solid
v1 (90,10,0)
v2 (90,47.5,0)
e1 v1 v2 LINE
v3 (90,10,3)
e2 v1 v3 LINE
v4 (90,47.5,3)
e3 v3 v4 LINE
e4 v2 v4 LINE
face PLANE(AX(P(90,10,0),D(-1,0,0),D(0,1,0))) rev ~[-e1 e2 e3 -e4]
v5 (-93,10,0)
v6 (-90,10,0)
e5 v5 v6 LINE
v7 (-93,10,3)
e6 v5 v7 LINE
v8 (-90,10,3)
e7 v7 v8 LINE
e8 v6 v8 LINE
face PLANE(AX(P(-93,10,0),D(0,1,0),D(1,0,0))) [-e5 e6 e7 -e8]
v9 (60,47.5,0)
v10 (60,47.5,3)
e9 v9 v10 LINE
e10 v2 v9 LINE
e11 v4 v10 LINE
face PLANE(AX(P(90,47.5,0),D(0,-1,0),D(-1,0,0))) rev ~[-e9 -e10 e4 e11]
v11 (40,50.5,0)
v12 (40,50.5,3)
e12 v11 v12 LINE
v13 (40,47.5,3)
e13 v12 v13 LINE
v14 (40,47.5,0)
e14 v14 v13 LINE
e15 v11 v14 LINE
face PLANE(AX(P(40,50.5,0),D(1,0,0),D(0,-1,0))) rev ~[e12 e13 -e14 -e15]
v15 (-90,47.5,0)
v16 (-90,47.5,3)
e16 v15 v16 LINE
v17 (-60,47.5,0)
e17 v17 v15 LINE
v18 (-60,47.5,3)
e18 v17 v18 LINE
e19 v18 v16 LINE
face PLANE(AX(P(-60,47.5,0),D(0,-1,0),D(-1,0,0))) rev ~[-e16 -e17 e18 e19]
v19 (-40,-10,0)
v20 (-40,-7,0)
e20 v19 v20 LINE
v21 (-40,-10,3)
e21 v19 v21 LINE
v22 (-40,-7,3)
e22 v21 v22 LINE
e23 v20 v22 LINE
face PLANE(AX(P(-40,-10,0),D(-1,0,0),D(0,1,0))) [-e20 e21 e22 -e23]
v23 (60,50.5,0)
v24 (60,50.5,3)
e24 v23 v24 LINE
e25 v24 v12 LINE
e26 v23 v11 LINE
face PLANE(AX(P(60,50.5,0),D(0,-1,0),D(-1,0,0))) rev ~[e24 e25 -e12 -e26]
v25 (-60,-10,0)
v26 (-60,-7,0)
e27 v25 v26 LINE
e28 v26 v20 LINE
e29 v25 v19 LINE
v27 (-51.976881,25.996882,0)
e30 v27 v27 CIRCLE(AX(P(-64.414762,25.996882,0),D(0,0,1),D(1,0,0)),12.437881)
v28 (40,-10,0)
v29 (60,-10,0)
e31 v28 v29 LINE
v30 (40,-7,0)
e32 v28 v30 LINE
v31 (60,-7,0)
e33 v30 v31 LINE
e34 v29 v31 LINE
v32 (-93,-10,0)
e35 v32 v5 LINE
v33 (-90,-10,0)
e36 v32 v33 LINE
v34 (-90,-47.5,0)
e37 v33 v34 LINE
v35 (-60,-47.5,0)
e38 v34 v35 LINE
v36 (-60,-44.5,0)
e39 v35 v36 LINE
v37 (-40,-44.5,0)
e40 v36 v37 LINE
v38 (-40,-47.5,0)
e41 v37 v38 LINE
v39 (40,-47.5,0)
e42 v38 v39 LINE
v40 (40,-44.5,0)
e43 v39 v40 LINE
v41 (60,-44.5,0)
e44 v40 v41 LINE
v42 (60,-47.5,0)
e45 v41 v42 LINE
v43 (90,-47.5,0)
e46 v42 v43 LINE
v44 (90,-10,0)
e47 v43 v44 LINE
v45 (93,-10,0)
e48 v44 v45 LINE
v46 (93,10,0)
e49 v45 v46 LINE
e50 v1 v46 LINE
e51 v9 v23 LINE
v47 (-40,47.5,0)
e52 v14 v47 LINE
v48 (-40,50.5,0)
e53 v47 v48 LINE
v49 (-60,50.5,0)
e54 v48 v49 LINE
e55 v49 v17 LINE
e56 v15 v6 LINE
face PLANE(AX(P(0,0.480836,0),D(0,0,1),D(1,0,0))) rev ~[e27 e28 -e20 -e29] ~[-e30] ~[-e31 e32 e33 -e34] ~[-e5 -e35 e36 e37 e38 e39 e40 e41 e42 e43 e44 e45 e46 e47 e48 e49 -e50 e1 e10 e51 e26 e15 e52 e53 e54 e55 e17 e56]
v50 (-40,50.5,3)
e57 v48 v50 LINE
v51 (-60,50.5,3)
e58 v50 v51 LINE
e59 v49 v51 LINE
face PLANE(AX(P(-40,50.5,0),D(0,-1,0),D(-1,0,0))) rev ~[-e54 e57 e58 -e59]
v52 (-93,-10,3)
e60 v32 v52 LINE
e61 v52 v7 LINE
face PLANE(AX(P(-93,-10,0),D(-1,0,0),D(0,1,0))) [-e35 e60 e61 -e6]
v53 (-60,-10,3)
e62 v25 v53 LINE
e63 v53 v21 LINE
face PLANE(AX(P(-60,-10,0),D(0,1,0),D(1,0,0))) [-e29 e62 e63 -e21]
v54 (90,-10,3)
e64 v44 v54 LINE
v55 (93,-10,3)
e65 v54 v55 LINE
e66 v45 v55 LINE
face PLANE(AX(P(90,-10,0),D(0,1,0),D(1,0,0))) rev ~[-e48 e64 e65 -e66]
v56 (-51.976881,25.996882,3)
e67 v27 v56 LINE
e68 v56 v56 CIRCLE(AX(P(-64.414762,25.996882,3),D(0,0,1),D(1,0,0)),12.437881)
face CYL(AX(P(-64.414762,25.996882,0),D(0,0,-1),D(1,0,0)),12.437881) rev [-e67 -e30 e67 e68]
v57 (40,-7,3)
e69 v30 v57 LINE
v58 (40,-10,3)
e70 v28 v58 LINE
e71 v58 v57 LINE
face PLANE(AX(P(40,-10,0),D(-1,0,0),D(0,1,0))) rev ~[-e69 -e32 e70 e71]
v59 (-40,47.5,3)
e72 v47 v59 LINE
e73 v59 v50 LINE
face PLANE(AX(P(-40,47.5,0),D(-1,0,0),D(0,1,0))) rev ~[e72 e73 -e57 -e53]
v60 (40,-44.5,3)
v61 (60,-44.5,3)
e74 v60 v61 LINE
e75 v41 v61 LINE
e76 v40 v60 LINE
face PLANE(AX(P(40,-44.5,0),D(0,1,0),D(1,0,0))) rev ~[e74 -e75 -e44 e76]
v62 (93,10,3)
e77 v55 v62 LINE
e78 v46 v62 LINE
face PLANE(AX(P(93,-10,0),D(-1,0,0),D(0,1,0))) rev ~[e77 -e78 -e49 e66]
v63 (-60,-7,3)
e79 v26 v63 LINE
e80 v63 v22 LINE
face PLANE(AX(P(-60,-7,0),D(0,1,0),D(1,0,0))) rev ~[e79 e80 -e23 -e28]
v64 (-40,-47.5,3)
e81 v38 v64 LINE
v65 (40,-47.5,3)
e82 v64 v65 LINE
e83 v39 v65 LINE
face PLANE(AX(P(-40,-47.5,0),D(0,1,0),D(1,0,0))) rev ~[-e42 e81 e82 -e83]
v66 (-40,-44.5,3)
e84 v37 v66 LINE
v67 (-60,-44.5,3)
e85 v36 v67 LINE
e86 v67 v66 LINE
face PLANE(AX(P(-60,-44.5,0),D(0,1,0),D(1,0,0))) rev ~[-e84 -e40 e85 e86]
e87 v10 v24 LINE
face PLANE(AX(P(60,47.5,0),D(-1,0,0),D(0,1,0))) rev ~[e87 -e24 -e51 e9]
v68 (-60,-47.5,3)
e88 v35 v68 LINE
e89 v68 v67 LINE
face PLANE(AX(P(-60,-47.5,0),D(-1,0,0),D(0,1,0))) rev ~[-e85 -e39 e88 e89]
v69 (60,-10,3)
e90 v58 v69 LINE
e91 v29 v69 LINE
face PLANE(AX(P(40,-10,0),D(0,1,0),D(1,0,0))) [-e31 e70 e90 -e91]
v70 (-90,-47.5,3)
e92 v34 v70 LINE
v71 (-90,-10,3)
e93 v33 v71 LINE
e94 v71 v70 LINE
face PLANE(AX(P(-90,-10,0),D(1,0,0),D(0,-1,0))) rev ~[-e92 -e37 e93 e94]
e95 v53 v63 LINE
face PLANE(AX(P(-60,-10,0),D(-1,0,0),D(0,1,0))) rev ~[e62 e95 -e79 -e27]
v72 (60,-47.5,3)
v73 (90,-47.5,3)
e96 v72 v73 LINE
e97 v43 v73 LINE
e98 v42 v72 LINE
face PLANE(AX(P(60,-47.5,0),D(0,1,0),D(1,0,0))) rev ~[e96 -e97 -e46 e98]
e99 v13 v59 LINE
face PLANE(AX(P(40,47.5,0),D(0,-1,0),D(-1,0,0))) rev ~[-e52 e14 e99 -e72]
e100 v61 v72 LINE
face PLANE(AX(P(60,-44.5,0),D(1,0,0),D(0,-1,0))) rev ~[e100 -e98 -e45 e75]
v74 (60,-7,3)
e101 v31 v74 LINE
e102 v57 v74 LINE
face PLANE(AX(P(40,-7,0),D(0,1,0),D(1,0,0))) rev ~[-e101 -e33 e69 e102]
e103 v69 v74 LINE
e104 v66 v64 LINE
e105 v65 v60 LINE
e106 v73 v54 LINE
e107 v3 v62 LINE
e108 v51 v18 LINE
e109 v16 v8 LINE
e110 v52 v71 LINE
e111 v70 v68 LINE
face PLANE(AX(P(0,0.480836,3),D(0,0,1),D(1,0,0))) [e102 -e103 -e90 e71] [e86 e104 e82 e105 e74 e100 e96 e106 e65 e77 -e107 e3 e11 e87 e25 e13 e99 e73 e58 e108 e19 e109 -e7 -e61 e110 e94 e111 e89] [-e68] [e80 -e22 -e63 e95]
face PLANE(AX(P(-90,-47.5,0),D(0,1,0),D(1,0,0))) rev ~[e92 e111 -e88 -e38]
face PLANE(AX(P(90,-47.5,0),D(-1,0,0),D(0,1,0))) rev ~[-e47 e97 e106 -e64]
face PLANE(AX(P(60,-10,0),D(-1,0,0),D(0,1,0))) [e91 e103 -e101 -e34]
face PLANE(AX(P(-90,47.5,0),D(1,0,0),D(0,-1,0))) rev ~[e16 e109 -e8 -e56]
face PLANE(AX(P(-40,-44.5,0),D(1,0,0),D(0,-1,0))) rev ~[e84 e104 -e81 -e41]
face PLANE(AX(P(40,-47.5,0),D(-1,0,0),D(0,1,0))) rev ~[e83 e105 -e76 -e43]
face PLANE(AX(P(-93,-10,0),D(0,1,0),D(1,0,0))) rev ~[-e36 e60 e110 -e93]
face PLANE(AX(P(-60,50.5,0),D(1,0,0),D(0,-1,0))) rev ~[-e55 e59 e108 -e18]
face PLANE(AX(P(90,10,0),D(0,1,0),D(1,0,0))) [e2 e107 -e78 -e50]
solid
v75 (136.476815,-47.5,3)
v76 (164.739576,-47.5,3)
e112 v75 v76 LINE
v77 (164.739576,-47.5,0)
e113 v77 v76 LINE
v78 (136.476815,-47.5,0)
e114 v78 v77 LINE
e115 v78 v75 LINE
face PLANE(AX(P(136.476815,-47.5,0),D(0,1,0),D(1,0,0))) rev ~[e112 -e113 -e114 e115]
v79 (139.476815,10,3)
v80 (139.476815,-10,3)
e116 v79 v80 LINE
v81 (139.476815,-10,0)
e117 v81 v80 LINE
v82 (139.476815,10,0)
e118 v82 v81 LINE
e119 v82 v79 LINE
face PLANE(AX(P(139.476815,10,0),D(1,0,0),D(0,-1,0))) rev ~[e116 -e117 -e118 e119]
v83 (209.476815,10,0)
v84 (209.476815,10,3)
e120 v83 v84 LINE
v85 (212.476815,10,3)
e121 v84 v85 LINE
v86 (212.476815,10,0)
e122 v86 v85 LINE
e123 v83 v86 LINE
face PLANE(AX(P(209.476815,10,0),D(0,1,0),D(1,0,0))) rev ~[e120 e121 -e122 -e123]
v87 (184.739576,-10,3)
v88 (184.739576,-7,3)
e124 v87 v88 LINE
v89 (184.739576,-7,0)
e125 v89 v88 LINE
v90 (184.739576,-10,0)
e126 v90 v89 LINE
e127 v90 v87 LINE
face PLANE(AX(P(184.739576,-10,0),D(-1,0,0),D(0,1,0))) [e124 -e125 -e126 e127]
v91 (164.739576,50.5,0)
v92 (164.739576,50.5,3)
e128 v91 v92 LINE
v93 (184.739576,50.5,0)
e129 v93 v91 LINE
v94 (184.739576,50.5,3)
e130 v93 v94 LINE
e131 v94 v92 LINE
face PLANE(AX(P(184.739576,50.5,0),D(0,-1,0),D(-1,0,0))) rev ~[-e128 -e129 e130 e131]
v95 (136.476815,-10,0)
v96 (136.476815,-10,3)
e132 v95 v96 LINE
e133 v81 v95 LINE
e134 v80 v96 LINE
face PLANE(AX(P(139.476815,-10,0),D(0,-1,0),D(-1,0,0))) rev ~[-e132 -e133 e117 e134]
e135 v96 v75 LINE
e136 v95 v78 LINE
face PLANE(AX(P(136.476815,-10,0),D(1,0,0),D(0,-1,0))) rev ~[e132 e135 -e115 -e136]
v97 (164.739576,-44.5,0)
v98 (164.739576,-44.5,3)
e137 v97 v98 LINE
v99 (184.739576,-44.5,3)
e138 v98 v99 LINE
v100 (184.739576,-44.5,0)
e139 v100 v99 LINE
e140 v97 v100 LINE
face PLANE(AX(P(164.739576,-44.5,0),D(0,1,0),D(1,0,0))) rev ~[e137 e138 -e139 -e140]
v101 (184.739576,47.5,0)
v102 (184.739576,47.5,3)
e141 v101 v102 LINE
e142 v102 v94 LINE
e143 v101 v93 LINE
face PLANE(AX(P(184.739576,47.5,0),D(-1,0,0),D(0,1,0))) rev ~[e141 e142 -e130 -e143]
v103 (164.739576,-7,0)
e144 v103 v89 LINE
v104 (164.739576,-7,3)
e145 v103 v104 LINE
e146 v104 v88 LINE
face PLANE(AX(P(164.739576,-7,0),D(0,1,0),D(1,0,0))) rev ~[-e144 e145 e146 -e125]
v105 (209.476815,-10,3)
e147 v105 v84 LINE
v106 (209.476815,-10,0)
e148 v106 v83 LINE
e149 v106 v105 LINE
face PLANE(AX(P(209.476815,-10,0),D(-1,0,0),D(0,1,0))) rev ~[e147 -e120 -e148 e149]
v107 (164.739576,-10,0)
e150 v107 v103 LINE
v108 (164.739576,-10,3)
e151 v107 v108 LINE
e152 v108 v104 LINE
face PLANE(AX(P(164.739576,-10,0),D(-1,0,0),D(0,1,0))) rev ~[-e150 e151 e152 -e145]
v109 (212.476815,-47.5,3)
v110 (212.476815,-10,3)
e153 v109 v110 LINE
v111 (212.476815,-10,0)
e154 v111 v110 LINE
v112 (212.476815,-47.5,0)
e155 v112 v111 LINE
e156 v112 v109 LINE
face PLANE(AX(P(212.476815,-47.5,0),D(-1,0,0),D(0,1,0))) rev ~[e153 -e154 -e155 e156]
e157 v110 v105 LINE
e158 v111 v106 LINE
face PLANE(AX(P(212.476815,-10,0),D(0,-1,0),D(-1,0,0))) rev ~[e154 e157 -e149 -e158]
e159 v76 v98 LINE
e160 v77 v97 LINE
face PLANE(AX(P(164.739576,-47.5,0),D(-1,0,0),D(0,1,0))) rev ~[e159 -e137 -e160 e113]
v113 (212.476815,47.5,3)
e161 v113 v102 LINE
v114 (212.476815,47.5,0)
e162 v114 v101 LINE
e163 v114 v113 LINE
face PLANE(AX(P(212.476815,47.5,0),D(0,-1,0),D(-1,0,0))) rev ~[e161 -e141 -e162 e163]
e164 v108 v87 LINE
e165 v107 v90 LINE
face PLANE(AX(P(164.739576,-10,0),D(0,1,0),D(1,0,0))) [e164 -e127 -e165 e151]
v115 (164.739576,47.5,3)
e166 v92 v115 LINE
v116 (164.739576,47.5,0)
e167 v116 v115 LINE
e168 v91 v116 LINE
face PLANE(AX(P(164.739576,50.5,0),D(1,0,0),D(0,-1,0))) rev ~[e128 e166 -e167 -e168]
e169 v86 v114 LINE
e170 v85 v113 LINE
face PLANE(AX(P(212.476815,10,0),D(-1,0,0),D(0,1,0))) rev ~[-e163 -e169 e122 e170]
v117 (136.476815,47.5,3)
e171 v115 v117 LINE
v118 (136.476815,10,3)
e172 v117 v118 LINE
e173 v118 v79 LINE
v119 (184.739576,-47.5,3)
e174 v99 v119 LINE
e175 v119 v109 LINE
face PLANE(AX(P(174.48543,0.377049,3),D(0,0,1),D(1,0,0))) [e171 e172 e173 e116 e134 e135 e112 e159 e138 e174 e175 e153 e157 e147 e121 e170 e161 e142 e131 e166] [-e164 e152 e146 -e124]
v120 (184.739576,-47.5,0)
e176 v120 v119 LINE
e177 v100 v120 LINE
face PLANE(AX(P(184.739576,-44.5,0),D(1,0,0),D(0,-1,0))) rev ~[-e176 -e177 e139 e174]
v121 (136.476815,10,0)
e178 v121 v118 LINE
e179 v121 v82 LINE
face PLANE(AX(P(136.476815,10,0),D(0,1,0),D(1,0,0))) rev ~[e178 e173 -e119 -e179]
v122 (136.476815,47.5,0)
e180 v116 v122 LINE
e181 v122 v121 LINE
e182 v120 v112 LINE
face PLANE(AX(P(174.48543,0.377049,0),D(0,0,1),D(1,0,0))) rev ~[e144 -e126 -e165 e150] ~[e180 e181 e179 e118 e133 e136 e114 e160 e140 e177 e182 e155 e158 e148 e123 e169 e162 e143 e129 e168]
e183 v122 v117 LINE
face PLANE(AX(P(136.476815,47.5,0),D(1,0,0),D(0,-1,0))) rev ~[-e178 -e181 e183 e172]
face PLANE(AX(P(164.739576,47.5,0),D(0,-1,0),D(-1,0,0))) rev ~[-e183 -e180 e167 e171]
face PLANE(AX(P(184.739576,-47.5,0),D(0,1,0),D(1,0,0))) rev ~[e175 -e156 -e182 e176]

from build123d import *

# Parameters (mm, degrees)
F1_W     = 20
F1_H     = 3
F1_R     = 12.4378806179
F1_W_2   = 3
F1_H_2   = 20
F2_DEPTH = 3
F3_DEPTH = 3


# Not quite as in the source:
# - a feature names something its author has since deleted; it is built from what else it names


with BuildPart() as f2:
    # F1 (on Top) → F2 (new body)
    with BuildSketch(Plane.XY):
        Polygon((-90, -10), (-90, -47.5), (-60, -47.5), (-60, -44.5), (-40, -44.5), (-40, -47.5), (40, -47.5), (40, -44.5), (60, -44.5), (60, -47.5), (90, -47.5), (90, -10), (90, 10), (90, 47.5), (60, 47.5), (60, 50.5), (40, 50.5), (40, 47.5), (-40, 47.5), (-40, 50.5), (-60, 50.5), (-60, 47.5), (-90, 47.5), (-90, 10), align=None)
        with Locations((-50, -8.5)):
            Rectangle(F1_W, F1_H, mode=Mode.SUBTRACT)
        with Locations((50, -8.5)):
            Rectangle(F1_W, F1_H, mode=Mode.SUBTRACT)
        with Locations((-64.4147619605, 25.9968824685)):
            Circle(F1_R, mode=Mode.SUBTRACT)
        with Locations((91.5, 0)):
            Rectangle(F1_W_2, F1_H_2)
        with Locations((-91.5, 0)):
            Rectangle(F1_W_2, F1_H_2)
    extrude(amount=F2_DEPTH)


with BuildPart() as f3:
    # F1 (on Top) → F3 (new body)
    with BuildSketch(Plane.XY):
        Polygon((212.4768147469, -10), (209.4768147469, -10), (209.4768147469, 10), (212.4768147469, 10), (212.4768147469, 47.5), (184.7395757437, 47.5), (184.7395757437, 50.5), (164.7395757437, 50.5), (164.7395757437, 47.5), (136.4768147469, 47.5), (136.4768147469, 10), (139.4768147469, 10), (139.4768147469, -10), (136.4768147469, -10), (136.4768147469, -47.5), (164.7395757437, -47.5), (164.7395757437, -44.5), (184.7395757437, -44.5), (184.7395757437, -47.5), (212.4768147469, -47.5), align=None)
        with Locations((174.7395757437, -8.5)):
            Rectangle(F1_W, F1_H, mode=Mode.SUBTRACT)
    extrude(amount=F3_DEPTH)


solid = Compound([f2.part, f3.part])
